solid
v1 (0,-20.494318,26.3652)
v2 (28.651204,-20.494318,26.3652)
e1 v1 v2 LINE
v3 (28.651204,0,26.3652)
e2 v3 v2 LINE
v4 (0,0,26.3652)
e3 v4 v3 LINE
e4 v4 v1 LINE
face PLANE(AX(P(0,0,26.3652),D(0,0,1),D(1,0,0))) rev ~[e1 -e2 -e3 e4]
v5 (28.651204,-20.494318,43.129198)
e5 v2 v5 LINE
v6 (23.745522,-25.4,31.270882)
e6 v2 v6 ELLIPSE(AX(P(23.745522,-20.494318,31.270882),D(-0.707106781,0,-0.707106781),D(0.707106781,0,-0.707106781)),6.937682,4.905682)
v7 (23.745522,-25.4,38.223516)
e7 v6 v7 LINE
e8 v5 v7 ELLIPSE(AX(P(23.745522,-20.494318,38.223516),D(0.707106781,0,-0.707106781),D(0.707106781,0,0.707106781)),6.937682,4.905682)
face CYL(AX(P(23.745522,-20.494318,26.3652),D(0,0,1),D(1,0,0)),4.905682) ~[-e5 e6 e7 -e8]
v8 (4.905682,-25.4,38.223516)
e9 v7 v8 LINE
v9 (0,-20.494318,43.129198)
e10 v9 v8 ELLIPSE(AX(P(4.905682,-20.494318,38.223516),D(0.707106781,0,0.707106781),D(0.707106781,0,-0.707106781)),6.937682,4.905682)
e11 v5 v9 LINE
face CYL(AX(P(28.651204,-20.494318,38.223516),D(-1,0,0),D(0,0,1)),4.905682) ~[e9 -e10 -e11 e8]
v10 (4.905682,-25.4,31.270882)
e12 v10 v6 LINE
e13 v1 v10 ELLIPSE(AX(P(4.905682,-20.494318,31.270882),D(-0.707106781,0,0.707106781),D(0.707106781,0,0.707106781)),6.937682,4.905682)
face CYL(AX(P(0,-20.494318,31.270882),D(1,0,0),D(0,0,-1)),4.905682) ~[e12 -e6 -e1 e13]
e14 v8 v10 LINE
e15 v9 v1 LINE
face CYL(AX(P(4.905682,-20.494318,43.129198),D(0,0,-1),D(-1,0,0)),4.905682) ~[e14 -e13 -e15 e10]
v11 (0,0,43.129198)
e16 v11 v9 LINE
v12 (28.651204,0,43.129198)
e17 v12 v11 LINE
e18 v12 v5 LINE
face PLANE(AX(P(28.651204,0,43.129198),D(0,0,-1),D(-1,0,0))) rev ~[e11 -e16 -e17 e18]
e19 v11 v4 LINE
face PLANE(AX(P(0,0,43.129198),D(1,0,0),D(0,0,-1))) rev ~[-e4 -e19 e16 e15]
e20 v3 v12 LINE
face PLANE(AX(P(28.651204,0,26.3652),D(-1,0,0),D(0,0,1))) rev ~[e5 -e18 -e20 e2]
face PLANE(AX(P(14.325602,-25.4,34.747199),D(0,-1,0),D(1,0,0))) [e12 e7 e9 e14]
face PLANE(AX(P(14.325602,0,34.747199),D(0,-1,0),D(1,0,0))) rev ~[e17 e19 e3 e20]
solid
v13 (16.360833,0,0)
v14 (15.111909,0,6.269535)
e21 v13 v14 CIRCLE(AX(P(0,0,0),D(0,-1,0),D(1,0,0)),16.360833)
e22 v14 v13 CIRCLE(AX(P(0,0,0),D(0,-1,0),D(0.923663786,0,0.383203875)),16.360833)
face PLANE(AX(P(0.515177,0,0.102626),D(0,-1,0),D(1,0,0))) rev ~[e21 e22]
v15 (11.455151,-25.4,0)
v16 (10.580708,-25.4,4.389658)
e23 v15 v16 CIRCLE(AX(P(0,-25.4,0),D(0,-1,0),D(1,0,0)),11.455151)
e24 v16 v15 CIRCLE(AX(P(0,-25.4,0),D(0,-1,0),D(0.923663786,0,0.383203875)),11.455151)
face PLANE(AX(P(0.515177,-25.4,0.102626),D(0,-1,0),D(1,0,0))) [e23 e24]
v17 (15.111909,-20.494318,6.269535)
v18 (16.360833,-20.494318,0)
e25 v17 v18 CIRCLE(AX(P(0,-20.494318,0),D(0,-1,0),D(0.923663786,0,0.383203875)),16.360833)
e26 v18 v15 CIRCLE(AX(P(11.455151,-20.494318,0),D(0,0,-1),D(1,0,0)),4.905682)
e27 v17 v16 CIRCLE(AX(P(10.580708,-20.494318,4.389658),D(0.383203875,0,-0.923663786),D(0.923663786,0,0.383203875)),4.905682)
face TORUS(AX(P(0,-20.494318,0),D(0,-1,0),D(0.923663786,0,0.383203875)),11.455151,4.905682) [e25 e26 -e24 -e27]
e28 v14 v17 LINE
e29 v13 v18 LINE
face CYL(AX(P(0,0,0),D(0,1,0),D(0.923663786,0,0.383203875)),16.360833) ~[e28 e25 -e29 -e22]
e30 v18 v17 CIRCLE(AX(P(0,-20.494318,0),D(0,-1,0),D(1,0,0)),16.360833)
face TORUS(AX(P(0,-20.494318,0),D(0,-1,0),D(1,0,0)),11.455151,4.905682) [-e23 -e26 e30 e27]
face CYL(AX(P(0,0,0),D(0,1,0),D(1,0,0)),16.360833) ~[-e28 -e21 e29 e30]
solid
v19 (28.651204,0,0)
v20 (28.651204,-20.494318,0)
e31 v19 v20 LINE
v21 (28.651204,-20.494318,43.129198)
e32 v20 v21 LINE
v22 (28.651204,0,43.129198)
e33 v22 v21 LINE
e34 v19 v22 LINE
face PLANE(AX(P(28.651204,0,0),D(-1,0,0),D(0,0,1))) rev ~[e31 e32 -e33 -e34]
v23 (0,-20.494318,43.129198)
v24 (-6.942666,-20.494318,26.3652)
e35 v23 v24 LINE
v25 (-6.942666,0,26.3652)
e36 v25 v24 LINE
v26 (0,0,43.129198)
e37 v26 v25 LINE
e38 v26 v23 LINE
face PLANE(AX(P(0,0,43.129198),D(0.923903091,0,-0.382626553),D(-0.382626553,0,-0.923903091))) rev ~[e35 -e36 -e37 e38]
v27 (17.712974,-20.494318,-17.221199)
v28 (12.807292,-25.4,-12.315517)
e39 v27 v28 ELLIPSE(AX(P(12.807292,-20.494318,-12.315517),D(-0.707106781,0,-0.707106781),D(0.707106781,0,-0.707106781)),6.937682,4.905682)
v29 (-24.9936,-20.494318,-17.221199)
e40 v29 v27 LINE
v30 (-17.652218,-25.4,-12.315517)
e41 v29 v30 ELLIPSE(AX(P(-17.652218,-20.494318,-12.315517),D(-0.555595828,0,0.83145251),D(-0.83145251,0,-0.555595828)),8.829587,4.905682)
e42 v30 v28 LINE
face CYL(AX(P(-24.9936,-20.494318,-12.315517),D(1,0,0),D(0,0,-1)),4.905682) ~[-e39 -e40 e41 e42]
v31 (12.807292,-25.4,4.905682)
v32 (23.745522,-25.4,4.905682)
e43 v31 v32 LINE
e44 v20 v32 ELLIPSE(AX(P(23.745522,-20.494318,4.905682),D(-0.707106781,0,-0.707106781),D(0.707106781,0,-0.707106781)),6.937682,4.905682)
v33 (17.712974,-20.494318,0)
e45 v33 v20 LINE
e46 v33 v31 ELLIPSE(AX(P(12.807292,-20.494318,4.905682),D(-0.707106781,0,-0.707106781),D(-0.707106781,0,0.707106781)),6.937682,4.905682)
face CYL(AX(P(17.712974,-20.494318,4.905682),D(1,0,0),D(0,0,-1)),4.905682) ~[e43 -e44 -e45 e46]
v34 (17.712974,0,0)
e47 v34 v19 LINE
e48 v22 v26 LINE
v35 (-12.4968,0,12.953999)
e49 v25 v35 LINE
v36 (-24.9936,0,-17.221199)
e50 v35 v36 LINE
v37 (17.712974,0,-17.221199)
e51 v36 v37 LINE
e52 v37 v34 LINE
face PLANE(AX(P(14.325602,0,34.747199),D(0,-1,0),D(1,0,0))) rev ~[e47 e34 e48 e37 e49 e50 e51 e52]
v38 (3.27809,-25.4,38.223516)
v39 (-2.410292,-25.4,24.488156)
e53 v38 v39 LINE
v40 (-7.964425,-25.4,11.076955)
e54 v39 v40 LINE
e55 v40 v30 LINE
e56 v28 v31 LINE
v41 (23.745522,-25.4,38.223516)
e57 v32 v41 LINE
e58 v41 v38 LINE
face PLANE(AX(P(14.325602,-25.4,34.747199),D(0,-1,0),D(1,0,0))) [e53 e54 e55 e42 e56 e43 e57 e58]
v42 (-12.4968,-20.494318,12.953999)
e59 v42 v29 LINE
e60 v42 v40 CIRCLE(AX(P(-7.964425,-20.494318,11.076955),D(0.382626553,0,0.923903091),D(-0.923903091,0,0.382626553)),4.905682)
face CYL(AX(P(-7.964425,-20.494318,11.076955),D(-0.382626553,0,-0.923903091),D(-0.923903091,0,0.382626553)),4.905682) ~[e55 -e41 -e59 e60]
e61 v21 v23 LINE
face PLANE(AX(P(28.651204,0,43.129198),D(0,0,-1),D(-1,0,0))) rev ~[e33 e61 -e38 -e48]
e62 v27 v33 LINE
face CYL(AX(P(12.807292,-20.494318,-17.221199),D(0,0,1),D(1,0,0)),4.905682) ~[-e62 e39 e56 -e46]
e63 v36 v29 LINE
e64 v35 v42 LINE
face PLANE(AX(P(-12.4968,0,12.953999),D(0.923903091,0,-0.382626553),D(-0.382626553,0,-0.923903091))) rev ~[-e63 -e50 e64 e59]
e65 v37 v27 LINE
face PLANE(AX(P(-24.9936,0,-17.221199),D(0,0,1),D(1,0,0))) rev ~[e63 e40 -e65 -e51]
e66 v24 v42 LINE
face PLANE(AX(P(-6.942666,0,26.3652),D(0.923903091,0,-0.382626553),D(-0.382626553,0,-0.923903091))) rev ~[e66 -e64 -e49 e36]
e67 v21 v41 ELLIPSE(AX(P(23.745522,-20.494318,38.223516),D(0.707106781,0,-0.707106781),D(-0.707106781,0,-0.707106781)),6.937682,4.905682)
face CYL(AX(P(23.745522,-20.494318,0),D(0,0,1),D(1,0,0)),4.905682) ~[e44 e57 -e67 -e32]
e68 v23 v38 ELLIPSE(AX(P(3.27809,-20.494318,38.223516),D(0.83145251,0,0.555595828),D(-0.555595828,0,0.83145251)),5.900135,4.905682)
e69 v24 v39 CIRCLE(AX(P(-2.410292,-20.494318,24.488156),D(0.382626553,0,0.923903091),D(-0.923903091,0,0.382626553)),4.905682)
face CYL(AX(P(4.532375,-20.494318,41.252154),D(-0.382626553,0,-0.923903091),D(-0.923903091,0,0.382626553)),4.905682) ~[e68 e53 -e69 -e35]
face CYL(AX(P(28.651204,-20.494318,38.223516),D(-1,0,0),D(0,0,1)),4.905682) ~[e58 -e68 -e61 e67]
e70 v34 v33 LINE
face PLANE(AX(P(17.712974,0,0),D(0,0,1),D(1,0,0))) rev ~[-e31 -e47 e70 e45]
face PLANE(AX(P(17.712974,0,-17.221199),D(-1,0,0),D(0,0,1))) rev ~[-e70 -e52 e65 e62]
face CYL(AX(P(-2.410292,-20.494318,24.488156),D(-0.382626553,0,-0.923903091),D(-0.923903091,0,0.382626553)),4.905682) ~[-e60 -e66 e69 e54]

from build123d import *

# Parameters (mm, degrees)
F1_DEPTH = 25.4
F2_DEPTH = 25.4
F3_R     = 4.9056819587
F3_2_R   = 4.9056819587
F3_3_R   = 4.9056819587


with BuildPart() as f1:
    # F0 (on Front) → F1 (new body)
    with BuildSketch(Plane.XZ):
        Polygon((0, 26.3652000576), (6.7747447512, 26.3652000576), (28.6512039602, 26.3652000576), (28.6512039602, 43.1291982532), (0, 43.1291982532), (0, 34.7471991554), align=None)
    extrude(amount=F1_DEPTH)

    # F3
    f3_edges = [f1.edges().sort_by_distance(p)[0] for p in [
        (14.325602, -25.4, 26.3652),
        (28.651204, -25.4, 34.747199),
        (0, -25.4, 34.747199),
        (14.325602, -25.4, 43.129198),
    ]]
    fillet(f3_edges, radius=F3_R)


with BuildPart() as f1b:
    # F0 (on Front) → F1, piece 2 (new body)
    with BuildSketch(Plane.XZ):
        with BuildLine():
            ThreePointArc((16.3608330212, 0), (16.0455644423, 3.1963602544), (15.1119089765, 6.2695346107))
            ThreePointArc((15.1119089765, 6.2695346107), (-16.0455644423, -3.1963602544), (16.3608330212, 0))
        make_face()
    extrude(amount=F1_DEPTH)

    # F3#2
    f3_2_edges = [f1b.edges().sort_by_distance(p)[0] for p in [
        (-16.360833, -25.4, 0),
    ]]
    fillet(f3_2_edges, radius=F3_2_R)


with BuildPart() as f2:
    # F0 (on Front) → F2 (new body)
    with BuildSketch(Plane.XZ):
        Polygon((0, 26.3652000576), (6.7747447512, 26.3652000576), (28.6512039602, 26.3652000576), (28.6512039602, 43.1291982532), (0, 43.1291982532), (0, 34.7471991554), align=None)
        Polygon((0, 43.1291982532), (-6.9426662852, 26.3652000576), (0, 26.3652000576), (0, 34.7471991554), align=None)
        Polygon((-6.9426662852, 26.3652000576), (-12.4968001619, 12.9539994523), (6.7747447512, 26.3652000576), (0, 26.3652000576), align=None)
        Polygon((15.1119089765, 6.2695346107), (17.7129743557, 0), (28.6512039602, 26.3652000576), (6.7747447512, 26.3652000576), align=None)
        Polygon((28.6512039602, 26.3652000576), (17.7129743557, 0), (28.6512039602, 0), align=None)
        Polygon((-12.4968001619, 12.9539994523), (-24.9936003238, -17.2211993486), (17.7129743557, -17.2211993486), (17.7129743557, 0), (15.1119089765, 6.2695346107), (6.7747447512, 26.3652000576), align=None)
        with BuildLine():
            ThreePointArc((16.3608330212, 0), (-16.0455644423, -3.1963602544), (15.1119089765, 6.2695346107))
            ThreePointArc((15.1119089765, 6.2695346107), (16.0455644423, 3.1963602544), (16.3608330212, 0))
        make_face(mode=Mode.SUBTRACT)
        with BuildLine():
            ThreePointArc((16.3608330212, 0), (16.0455644423, 3.1963602544), (15.1119089765, 6.2695346107))
            ThreePointArc((15.1119089765, 6.2695346107), (-16.0455644423, -3.1963602544), (16.3608330212, 0))
        make_face()
    extrude(amount=F2_DEPTH)

    # F3#3
    f3_3_edges = [f2.edges().sort_by_distance(p)[0] for p in [
        (14.325602, -25.4, 43.129198),
        (-12.4968, -25.4, 12.953999),
        (-3.640313, -25.4, -17.221199),
        (17.712974, -25.4, -8.6106),
        (23.182089, -25.4, 0),
        (28.651204, -25.4, 21.564599),
    ]]
    fillet(f3_3_edges, radius=F3_3_R)


solid = Compound([f1.part, f1b.part, f2.part])
